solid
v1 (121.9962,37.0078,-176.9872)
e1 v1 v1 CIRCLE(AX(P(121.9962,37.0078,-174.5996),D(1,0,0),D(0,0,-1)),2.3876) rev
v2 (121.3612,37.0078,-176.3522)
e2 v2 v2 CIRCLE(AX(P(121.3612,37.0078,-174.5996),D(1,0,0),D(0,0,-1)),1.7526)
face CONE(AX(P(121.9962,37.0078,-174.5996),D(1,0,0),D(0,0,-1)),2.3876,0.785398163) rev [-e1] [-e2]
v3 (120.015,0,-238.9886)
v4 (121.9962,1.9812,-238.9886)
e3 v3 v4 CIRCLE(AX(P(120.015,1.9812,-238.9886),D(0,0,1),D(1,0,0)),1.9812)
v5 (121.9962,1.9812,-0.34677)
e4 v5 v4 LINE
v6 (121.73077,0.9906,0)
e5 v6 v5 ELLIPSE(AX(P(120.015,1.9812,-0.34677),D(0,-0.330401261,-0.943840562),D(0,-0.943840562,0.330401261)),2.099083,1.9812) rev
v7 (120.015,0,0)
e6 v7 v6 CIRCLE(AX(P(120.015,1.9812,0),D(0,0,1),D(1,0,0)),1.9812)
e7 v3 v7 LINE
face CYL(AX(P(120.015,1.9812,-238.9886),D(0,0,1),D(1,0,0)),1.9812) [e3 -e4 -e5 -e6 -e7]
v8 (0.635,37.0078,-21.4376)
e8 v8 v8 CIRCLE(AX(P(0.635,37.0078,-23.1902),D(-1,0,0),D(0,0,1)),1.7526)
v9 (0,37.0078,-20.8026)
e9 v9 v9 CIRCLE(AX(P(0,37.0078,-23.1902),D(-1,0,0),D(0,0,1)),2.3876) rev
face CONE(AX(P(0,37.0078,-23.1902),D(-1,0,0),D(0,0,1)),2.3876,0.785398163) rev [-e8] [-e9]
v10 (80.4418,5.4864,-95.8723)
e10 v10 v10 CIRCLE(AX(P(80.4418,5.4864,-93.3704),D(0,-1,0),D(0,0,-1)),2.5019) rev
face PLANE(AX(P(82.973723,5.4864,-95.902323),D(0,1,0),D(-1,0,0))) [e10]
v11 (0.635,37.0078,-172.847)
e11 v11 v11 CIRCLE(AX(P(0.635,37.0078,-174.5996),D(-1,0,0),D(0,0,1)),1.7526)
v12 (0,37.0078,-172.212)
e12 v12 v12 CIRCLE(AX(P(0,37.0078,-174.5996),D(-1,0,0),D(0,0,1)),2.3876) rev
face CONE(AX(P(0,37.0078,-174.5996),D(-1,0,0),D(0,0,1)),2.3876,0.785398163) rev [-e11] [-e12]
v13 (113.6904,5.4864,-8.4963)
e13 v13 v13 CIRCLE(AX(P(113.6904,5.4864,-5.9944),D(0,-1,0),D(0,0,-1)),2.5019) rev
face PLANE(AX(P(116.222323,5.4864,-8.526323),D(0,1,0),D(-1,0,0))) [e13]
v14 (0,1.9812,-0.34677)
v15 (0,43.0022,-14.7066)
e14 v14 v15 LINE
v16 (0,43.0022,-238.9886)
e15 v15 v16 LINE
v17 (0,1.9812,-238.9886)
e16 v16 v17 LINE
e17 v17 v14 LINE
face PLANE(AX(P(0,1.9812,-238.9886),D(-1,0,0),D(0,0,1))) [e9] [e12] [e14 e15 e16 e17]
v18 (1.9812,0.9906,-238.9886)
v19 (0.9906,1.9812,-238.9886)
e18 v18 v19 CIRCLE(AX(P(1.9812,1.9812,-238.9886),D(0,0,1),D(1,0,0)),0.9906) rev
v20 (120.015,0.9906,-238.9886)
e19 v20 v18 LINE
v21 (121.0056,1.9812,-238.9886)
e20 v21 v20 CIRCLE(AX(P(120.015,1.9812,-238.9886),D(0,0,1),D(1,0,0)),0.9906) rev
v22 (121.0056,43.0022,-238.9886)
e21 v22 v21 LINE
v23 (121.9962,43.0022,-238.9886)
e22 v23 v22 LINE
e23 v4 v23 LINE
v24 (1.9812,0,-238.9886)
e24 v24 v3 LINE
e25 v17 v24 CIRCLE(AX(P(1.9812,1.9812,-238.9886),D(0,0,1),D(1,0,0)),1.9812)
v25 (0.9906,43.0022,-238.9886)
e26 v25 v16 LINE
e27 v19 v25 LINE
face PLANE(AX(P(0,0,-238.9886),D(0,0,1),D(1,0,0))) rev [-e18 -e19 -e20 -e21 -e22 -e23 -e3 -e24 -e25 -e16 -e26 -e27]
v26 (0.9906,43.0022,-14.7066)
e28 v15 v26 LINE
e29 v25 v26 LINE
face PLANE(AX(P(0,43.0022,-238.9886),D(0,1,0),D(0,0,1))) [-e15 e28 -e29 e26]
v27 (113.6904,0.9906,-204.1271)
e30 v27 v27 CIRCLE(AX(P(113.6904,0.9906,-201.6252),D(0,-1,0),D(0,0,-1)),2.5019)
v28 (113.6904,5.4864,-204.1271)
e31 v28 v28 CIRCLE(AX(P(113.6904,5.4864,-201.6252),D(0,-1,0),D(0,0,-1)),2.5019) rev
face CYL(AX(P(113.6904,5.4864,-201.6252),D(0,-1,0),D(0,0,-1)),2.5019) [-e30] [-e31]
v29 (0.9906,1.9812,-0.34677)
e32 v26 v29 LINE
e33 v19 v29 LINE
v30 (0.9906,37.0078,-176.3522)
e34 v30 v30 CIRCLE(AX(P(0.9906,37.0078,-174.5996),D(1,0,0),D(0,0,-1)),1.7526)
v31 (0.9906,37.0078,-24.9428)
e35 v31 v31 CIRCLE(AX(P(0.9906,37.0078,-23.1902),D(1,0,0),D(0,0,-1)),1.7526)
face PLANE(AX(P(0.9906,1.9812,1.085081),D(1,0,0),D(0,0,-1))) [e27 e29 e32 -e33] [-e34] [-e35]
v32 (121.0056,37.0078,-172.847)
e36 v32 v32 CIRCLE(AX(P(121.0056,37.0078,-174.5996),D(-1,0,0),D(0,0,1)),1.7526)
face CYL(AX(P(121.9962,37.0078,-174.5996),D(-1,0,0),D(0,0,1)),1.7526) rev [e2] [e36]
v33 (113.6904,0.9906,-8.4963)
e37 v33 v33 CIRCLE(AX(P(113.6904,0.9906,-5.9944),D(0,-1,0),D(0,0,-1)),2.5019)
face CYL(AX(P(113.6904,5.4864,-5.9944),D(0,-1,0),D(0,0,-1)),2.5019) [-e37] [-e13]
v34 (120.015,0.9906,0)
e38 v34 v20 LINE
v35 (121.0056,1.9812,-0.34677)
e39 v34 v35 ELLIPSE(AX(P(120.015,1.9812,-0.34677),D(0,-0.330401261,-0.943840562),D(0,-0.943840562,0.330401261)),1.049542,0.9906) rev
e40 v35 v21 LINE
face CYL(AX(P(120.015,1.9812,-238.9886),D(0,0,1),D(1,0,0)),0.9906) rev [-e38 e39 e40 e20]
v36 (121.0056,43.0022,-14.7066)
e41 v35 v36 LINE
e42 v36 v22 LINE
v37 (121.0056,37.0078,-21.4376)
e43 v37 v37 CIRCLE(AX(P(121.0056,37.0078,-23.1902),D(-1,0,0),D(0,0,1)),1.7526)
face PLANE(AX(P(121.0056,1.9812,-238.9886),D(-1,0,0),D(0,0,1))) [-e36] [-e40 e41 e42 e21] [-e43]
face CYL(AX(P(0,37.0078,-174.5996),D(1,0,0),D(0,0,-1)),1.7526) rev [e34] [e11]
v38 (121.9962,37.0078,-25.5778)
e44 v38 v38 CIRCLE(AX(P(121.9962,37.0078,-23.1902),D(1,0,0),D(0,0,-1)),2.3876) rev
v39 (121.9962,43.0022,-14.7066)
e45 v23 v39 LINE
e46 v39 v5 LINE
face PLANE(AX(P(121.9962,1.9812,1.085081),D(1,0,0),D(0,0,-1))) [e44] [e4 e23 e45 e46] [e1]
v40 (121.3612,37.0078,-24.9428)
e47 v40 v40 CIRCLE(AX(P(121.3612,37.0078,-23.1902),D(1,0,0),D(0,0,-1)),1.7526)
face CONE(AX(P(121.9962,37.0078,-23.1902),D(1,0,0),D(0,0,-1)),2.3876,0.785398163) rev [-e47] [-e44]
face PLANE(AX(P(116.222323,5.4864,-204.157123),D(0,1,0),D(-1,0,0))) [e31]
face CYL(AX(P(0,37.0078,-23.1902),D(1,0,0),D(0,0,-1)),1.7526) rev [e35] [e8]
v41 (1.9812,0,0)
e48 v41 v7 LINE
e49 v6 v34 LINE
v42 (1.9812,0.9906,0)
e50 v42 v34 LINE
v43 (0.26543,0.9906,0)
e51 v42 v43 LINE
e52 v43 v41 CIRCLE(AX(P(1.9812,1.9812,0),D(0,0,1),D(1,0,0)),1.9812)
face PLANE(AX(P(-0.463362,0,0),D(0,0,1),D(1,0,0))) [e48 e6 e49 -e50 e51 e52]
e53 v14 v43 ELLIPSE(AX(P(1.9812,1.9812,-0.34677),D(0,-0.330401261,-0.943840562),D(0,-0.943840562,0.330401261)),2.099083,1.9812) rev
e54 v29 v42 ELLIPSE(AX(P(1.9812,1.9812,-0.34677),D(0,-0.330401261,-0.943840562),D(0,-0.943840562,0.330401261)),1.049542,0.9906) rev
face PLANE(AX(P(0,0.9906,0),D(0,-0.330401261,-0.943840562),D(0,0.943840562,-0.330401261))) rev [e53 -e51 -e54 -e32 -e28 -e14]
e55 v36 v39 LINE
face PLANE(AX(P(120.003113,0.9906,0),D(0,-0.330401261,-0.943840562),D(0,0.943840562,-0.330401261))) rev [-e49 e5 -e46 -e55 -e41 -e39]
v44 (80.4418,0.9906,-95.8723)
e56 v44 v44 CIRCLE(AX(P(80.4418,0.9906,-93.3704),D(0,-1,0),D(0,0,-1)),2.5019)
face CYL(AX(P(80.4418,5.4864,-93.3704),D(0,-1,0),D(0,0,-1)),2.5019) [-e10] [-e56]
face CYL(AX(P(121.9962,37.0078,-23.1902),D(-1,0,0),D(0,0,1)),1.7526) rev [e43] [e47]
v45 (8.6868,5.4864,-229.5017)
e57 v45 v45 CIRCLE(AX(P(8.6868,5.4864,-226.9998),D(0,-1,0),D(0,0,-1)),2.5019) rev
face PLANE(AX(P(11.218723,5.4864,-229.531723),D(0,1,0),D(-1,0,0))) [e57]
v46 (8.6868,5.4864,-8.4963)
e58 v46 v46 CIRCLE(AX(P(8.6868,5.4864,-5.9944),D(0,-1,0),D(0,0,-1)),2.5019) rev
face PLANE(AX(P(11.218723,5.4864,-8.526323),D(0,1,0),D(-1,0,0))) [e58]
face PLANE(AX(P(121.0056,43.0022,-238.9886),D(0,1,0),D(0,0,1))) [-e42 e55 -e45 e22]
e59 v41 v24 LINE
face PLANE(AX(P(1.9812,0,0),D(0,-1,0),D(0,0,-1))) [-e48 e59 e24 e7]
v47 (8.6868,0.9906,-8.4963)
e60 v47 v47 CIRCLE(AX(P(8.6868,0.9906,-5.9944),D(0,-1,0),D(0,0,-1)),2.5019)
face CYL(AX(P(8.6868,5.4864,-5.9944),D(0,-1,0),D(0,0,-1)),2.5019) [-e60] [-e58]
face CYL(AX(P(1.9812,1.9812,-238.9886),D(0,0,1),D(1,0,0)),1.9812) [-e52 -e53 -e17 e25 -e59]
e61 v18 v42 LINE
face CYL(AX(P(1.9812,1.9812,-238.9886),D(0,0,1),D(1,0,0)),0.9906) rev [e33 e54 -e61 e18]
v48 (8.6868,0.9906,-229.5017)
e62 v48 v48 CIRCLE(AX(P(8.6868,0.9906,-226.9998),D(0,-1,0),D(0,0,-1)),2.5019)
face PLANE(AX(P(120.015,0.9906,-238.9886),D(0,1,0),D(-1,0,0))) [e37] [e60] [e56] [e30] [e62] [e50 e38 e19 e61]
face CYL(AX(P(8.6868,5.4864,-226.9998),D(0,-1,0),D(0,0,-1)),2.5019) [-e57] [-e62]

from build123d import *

# Parameters (mm, degrees)
CUT_EXTRUDE2_OUTLINE_R   = 2.5019
CUT_EXTRUDE2_DEPTH       = 5.4864
CUT_EXTRUDE2_START       = -238.9886
CUT_EXTRUDE2_2_DEPTH     = 238.9886
CUT_EXTRUDE2_START_2     = -1
CUT_EXTRUDE2_3_DEPTH     = 124
CUT_EXTRUDE2_START_3     = 120.015
CUT_EXTRUDE2_4_OUTLINE_R = 1.7526
CUT_EXTRUDE2_4_DEPTH     = 2.985
CHAMFER1_SIZE            = 0.635
CHAMFER2_SIZE            = 0.635
CUT_EXTRUDE3_START       = -0.9906
SKETCH2_R                = 1.7526
CUT_EXTRUDE3_DEPTH       = 0.9906
CHAMFER3_SIZE            = 0.635


with BuildPart() as part:
    # Cut-Extrude2: read off the stored shape, not the designer's step
    # Cut-Extrude2 outline → Cut-Extrude2 (new body)
    with BuildSketch(Plane(origin=(0, 0, 0), x_dir=(1, 0, 0), z_dir=(0, 1, 0))):
        with Locations((113.6904, 201.6252)):
            Circle(CUT_EXTRUDE2_OUTLINE_R)
        with Locations((80.4418, 93.3704)):
            Circle(CUT_EXTRUDE2_OUTLINE_R)
        with Locations((113.6904, 5.9944)):
            Circle(CUT_EXTRUDE2_OUTLINE_R)
        with Locations((8.6868, 5.9944)):
            Circle(CUT_EXTRUDE2_OUTLINE_R)
        with Locations((8.6868, 226.9998)):
            Circle(CUT_EXTRUDE2_OUTLINE_R)
    extrude(amount=CUT_EXTRUDE2_DEPTH)

    # Cut-Extrude2 2 outline → Cut-Extrude2 2 (add)
    with BuildSketch(Plane.XY.offset(CUT_EXTRUDE2_START)):
        with BuildLine():
            Line((121.9962, 1.9812), (121.9962, 43.0022))
            Line((121.9962, 43.0022), (121.0056, 43.0022))
            Line((121.0056, 43.0022), (121.0056, 1.9812))
            ThreePointArc((121.0056, 1.9812), (120.715459977, 1.280740023), (120.015, 0.9906))
            Line((120.015, 0.9906), (1.9812, 0.9906))
            ThreePointArc((1.9812, 0.9906), (1.280740019, 1.280740026), (0.9906, 1.98120001))
            Line((0.9906, 1.98120001), (0.9906, 43.0022))
            Line((0.9906, 43.0022), (0, 43.0022))
            Line((0, 43.0022), (0, 1.98120001))
            ThreePointArc((0, 1.98120001), (0.580280042, 0.580280049), (1.9812, 0))
            Line((1.9812, 0), (120.014999999, 0))
            ThreePointArc((120.014999999, 0), (121.415919955, 0.580280045), (121.9962, 1.9812))
        make_face()
    extrude(amount=CUT_EXTRUDE2_2_DEPTH)

    # Cut-Extrude2 3 outline → Cut-Extrude2 3 (cut)
    with BuildSketch(Plane.YZ.offset(CUT_EXTRUDE2_START_2)):
        Polygon((43.0022, 0), (0.9906, 0), (43.002200003, -14.706600001), align=None)
    extrude(amount=CUT_EXTRUDE2_3_DEPTH, mode=Mode.SUBTRACT)

    # Cut-Extrude2 4 outline → Cut-Extrude2 4 (cut)
    with BuildSketch(Plane.YZ.offset(CUT_EXTRUDE2_START_3)):
        with Locations((37.0078, -23.1902)):
            Circle(CUT_EXTRUDE2_4_OUTLINE_R)
        with Locations((37.0078, -174.5996)):
            Circle(CUT_EXTRUDE2_4_OUTLINE_R)
    extrude(amount=CUT_EXTRUDE2_4_DEPTH, mode=Mode.SUBTRACT)

    # Chamfer1
    chamfer1_edges = [part.edges().sort_by_distance(p)[0] for p in [
        (121.9962, 35.2552, -23.1902),
    ]]
    chamfer(chamfer1_edges, length=CHAMFER1_SIZE)

    # Chamfer2
    chamfer2_edges = [part.edges().sort_by_distance(p)[0] for p in [
        (121.9962, 35.2552, -174.5996),
    ]]
    chamfer(chamfer2_edges, length=CHAMFER2_SIZE)

    # Sketch2 → Cut-Extrude3 (cut)
    with BuildSketch(Plane(origin=(0.9906, 0, 0), x_dir=(0, 0, -1), z_dir=(1, 0, 0)).offset(CUT_EXTRUDE3_START)):
        with Locations(Location((23.1902, 37.0078, 0), (0, 0, 180))):
            Circle(SKETCH2_R)
        with Locations(Location((174.5996, 37.0078, 0), (0, 0, 180))):
            Circle(SKETCH2_R)
    extrude(amount=CUT_EXTRUDE3_DEPTH, mode=Mode.SUBTRACT)

    # Chamfer3
    chamfer3_edges = [part.edges().sort_by_distance(p)[0] for p in [
        (0, 37.0078, -24.9428),
        (0, 37.0078, -176.3522),
    ]]
    chamfer(chamfer3_edges, length=CHAMFER3_SIZE)


solid = part.part
